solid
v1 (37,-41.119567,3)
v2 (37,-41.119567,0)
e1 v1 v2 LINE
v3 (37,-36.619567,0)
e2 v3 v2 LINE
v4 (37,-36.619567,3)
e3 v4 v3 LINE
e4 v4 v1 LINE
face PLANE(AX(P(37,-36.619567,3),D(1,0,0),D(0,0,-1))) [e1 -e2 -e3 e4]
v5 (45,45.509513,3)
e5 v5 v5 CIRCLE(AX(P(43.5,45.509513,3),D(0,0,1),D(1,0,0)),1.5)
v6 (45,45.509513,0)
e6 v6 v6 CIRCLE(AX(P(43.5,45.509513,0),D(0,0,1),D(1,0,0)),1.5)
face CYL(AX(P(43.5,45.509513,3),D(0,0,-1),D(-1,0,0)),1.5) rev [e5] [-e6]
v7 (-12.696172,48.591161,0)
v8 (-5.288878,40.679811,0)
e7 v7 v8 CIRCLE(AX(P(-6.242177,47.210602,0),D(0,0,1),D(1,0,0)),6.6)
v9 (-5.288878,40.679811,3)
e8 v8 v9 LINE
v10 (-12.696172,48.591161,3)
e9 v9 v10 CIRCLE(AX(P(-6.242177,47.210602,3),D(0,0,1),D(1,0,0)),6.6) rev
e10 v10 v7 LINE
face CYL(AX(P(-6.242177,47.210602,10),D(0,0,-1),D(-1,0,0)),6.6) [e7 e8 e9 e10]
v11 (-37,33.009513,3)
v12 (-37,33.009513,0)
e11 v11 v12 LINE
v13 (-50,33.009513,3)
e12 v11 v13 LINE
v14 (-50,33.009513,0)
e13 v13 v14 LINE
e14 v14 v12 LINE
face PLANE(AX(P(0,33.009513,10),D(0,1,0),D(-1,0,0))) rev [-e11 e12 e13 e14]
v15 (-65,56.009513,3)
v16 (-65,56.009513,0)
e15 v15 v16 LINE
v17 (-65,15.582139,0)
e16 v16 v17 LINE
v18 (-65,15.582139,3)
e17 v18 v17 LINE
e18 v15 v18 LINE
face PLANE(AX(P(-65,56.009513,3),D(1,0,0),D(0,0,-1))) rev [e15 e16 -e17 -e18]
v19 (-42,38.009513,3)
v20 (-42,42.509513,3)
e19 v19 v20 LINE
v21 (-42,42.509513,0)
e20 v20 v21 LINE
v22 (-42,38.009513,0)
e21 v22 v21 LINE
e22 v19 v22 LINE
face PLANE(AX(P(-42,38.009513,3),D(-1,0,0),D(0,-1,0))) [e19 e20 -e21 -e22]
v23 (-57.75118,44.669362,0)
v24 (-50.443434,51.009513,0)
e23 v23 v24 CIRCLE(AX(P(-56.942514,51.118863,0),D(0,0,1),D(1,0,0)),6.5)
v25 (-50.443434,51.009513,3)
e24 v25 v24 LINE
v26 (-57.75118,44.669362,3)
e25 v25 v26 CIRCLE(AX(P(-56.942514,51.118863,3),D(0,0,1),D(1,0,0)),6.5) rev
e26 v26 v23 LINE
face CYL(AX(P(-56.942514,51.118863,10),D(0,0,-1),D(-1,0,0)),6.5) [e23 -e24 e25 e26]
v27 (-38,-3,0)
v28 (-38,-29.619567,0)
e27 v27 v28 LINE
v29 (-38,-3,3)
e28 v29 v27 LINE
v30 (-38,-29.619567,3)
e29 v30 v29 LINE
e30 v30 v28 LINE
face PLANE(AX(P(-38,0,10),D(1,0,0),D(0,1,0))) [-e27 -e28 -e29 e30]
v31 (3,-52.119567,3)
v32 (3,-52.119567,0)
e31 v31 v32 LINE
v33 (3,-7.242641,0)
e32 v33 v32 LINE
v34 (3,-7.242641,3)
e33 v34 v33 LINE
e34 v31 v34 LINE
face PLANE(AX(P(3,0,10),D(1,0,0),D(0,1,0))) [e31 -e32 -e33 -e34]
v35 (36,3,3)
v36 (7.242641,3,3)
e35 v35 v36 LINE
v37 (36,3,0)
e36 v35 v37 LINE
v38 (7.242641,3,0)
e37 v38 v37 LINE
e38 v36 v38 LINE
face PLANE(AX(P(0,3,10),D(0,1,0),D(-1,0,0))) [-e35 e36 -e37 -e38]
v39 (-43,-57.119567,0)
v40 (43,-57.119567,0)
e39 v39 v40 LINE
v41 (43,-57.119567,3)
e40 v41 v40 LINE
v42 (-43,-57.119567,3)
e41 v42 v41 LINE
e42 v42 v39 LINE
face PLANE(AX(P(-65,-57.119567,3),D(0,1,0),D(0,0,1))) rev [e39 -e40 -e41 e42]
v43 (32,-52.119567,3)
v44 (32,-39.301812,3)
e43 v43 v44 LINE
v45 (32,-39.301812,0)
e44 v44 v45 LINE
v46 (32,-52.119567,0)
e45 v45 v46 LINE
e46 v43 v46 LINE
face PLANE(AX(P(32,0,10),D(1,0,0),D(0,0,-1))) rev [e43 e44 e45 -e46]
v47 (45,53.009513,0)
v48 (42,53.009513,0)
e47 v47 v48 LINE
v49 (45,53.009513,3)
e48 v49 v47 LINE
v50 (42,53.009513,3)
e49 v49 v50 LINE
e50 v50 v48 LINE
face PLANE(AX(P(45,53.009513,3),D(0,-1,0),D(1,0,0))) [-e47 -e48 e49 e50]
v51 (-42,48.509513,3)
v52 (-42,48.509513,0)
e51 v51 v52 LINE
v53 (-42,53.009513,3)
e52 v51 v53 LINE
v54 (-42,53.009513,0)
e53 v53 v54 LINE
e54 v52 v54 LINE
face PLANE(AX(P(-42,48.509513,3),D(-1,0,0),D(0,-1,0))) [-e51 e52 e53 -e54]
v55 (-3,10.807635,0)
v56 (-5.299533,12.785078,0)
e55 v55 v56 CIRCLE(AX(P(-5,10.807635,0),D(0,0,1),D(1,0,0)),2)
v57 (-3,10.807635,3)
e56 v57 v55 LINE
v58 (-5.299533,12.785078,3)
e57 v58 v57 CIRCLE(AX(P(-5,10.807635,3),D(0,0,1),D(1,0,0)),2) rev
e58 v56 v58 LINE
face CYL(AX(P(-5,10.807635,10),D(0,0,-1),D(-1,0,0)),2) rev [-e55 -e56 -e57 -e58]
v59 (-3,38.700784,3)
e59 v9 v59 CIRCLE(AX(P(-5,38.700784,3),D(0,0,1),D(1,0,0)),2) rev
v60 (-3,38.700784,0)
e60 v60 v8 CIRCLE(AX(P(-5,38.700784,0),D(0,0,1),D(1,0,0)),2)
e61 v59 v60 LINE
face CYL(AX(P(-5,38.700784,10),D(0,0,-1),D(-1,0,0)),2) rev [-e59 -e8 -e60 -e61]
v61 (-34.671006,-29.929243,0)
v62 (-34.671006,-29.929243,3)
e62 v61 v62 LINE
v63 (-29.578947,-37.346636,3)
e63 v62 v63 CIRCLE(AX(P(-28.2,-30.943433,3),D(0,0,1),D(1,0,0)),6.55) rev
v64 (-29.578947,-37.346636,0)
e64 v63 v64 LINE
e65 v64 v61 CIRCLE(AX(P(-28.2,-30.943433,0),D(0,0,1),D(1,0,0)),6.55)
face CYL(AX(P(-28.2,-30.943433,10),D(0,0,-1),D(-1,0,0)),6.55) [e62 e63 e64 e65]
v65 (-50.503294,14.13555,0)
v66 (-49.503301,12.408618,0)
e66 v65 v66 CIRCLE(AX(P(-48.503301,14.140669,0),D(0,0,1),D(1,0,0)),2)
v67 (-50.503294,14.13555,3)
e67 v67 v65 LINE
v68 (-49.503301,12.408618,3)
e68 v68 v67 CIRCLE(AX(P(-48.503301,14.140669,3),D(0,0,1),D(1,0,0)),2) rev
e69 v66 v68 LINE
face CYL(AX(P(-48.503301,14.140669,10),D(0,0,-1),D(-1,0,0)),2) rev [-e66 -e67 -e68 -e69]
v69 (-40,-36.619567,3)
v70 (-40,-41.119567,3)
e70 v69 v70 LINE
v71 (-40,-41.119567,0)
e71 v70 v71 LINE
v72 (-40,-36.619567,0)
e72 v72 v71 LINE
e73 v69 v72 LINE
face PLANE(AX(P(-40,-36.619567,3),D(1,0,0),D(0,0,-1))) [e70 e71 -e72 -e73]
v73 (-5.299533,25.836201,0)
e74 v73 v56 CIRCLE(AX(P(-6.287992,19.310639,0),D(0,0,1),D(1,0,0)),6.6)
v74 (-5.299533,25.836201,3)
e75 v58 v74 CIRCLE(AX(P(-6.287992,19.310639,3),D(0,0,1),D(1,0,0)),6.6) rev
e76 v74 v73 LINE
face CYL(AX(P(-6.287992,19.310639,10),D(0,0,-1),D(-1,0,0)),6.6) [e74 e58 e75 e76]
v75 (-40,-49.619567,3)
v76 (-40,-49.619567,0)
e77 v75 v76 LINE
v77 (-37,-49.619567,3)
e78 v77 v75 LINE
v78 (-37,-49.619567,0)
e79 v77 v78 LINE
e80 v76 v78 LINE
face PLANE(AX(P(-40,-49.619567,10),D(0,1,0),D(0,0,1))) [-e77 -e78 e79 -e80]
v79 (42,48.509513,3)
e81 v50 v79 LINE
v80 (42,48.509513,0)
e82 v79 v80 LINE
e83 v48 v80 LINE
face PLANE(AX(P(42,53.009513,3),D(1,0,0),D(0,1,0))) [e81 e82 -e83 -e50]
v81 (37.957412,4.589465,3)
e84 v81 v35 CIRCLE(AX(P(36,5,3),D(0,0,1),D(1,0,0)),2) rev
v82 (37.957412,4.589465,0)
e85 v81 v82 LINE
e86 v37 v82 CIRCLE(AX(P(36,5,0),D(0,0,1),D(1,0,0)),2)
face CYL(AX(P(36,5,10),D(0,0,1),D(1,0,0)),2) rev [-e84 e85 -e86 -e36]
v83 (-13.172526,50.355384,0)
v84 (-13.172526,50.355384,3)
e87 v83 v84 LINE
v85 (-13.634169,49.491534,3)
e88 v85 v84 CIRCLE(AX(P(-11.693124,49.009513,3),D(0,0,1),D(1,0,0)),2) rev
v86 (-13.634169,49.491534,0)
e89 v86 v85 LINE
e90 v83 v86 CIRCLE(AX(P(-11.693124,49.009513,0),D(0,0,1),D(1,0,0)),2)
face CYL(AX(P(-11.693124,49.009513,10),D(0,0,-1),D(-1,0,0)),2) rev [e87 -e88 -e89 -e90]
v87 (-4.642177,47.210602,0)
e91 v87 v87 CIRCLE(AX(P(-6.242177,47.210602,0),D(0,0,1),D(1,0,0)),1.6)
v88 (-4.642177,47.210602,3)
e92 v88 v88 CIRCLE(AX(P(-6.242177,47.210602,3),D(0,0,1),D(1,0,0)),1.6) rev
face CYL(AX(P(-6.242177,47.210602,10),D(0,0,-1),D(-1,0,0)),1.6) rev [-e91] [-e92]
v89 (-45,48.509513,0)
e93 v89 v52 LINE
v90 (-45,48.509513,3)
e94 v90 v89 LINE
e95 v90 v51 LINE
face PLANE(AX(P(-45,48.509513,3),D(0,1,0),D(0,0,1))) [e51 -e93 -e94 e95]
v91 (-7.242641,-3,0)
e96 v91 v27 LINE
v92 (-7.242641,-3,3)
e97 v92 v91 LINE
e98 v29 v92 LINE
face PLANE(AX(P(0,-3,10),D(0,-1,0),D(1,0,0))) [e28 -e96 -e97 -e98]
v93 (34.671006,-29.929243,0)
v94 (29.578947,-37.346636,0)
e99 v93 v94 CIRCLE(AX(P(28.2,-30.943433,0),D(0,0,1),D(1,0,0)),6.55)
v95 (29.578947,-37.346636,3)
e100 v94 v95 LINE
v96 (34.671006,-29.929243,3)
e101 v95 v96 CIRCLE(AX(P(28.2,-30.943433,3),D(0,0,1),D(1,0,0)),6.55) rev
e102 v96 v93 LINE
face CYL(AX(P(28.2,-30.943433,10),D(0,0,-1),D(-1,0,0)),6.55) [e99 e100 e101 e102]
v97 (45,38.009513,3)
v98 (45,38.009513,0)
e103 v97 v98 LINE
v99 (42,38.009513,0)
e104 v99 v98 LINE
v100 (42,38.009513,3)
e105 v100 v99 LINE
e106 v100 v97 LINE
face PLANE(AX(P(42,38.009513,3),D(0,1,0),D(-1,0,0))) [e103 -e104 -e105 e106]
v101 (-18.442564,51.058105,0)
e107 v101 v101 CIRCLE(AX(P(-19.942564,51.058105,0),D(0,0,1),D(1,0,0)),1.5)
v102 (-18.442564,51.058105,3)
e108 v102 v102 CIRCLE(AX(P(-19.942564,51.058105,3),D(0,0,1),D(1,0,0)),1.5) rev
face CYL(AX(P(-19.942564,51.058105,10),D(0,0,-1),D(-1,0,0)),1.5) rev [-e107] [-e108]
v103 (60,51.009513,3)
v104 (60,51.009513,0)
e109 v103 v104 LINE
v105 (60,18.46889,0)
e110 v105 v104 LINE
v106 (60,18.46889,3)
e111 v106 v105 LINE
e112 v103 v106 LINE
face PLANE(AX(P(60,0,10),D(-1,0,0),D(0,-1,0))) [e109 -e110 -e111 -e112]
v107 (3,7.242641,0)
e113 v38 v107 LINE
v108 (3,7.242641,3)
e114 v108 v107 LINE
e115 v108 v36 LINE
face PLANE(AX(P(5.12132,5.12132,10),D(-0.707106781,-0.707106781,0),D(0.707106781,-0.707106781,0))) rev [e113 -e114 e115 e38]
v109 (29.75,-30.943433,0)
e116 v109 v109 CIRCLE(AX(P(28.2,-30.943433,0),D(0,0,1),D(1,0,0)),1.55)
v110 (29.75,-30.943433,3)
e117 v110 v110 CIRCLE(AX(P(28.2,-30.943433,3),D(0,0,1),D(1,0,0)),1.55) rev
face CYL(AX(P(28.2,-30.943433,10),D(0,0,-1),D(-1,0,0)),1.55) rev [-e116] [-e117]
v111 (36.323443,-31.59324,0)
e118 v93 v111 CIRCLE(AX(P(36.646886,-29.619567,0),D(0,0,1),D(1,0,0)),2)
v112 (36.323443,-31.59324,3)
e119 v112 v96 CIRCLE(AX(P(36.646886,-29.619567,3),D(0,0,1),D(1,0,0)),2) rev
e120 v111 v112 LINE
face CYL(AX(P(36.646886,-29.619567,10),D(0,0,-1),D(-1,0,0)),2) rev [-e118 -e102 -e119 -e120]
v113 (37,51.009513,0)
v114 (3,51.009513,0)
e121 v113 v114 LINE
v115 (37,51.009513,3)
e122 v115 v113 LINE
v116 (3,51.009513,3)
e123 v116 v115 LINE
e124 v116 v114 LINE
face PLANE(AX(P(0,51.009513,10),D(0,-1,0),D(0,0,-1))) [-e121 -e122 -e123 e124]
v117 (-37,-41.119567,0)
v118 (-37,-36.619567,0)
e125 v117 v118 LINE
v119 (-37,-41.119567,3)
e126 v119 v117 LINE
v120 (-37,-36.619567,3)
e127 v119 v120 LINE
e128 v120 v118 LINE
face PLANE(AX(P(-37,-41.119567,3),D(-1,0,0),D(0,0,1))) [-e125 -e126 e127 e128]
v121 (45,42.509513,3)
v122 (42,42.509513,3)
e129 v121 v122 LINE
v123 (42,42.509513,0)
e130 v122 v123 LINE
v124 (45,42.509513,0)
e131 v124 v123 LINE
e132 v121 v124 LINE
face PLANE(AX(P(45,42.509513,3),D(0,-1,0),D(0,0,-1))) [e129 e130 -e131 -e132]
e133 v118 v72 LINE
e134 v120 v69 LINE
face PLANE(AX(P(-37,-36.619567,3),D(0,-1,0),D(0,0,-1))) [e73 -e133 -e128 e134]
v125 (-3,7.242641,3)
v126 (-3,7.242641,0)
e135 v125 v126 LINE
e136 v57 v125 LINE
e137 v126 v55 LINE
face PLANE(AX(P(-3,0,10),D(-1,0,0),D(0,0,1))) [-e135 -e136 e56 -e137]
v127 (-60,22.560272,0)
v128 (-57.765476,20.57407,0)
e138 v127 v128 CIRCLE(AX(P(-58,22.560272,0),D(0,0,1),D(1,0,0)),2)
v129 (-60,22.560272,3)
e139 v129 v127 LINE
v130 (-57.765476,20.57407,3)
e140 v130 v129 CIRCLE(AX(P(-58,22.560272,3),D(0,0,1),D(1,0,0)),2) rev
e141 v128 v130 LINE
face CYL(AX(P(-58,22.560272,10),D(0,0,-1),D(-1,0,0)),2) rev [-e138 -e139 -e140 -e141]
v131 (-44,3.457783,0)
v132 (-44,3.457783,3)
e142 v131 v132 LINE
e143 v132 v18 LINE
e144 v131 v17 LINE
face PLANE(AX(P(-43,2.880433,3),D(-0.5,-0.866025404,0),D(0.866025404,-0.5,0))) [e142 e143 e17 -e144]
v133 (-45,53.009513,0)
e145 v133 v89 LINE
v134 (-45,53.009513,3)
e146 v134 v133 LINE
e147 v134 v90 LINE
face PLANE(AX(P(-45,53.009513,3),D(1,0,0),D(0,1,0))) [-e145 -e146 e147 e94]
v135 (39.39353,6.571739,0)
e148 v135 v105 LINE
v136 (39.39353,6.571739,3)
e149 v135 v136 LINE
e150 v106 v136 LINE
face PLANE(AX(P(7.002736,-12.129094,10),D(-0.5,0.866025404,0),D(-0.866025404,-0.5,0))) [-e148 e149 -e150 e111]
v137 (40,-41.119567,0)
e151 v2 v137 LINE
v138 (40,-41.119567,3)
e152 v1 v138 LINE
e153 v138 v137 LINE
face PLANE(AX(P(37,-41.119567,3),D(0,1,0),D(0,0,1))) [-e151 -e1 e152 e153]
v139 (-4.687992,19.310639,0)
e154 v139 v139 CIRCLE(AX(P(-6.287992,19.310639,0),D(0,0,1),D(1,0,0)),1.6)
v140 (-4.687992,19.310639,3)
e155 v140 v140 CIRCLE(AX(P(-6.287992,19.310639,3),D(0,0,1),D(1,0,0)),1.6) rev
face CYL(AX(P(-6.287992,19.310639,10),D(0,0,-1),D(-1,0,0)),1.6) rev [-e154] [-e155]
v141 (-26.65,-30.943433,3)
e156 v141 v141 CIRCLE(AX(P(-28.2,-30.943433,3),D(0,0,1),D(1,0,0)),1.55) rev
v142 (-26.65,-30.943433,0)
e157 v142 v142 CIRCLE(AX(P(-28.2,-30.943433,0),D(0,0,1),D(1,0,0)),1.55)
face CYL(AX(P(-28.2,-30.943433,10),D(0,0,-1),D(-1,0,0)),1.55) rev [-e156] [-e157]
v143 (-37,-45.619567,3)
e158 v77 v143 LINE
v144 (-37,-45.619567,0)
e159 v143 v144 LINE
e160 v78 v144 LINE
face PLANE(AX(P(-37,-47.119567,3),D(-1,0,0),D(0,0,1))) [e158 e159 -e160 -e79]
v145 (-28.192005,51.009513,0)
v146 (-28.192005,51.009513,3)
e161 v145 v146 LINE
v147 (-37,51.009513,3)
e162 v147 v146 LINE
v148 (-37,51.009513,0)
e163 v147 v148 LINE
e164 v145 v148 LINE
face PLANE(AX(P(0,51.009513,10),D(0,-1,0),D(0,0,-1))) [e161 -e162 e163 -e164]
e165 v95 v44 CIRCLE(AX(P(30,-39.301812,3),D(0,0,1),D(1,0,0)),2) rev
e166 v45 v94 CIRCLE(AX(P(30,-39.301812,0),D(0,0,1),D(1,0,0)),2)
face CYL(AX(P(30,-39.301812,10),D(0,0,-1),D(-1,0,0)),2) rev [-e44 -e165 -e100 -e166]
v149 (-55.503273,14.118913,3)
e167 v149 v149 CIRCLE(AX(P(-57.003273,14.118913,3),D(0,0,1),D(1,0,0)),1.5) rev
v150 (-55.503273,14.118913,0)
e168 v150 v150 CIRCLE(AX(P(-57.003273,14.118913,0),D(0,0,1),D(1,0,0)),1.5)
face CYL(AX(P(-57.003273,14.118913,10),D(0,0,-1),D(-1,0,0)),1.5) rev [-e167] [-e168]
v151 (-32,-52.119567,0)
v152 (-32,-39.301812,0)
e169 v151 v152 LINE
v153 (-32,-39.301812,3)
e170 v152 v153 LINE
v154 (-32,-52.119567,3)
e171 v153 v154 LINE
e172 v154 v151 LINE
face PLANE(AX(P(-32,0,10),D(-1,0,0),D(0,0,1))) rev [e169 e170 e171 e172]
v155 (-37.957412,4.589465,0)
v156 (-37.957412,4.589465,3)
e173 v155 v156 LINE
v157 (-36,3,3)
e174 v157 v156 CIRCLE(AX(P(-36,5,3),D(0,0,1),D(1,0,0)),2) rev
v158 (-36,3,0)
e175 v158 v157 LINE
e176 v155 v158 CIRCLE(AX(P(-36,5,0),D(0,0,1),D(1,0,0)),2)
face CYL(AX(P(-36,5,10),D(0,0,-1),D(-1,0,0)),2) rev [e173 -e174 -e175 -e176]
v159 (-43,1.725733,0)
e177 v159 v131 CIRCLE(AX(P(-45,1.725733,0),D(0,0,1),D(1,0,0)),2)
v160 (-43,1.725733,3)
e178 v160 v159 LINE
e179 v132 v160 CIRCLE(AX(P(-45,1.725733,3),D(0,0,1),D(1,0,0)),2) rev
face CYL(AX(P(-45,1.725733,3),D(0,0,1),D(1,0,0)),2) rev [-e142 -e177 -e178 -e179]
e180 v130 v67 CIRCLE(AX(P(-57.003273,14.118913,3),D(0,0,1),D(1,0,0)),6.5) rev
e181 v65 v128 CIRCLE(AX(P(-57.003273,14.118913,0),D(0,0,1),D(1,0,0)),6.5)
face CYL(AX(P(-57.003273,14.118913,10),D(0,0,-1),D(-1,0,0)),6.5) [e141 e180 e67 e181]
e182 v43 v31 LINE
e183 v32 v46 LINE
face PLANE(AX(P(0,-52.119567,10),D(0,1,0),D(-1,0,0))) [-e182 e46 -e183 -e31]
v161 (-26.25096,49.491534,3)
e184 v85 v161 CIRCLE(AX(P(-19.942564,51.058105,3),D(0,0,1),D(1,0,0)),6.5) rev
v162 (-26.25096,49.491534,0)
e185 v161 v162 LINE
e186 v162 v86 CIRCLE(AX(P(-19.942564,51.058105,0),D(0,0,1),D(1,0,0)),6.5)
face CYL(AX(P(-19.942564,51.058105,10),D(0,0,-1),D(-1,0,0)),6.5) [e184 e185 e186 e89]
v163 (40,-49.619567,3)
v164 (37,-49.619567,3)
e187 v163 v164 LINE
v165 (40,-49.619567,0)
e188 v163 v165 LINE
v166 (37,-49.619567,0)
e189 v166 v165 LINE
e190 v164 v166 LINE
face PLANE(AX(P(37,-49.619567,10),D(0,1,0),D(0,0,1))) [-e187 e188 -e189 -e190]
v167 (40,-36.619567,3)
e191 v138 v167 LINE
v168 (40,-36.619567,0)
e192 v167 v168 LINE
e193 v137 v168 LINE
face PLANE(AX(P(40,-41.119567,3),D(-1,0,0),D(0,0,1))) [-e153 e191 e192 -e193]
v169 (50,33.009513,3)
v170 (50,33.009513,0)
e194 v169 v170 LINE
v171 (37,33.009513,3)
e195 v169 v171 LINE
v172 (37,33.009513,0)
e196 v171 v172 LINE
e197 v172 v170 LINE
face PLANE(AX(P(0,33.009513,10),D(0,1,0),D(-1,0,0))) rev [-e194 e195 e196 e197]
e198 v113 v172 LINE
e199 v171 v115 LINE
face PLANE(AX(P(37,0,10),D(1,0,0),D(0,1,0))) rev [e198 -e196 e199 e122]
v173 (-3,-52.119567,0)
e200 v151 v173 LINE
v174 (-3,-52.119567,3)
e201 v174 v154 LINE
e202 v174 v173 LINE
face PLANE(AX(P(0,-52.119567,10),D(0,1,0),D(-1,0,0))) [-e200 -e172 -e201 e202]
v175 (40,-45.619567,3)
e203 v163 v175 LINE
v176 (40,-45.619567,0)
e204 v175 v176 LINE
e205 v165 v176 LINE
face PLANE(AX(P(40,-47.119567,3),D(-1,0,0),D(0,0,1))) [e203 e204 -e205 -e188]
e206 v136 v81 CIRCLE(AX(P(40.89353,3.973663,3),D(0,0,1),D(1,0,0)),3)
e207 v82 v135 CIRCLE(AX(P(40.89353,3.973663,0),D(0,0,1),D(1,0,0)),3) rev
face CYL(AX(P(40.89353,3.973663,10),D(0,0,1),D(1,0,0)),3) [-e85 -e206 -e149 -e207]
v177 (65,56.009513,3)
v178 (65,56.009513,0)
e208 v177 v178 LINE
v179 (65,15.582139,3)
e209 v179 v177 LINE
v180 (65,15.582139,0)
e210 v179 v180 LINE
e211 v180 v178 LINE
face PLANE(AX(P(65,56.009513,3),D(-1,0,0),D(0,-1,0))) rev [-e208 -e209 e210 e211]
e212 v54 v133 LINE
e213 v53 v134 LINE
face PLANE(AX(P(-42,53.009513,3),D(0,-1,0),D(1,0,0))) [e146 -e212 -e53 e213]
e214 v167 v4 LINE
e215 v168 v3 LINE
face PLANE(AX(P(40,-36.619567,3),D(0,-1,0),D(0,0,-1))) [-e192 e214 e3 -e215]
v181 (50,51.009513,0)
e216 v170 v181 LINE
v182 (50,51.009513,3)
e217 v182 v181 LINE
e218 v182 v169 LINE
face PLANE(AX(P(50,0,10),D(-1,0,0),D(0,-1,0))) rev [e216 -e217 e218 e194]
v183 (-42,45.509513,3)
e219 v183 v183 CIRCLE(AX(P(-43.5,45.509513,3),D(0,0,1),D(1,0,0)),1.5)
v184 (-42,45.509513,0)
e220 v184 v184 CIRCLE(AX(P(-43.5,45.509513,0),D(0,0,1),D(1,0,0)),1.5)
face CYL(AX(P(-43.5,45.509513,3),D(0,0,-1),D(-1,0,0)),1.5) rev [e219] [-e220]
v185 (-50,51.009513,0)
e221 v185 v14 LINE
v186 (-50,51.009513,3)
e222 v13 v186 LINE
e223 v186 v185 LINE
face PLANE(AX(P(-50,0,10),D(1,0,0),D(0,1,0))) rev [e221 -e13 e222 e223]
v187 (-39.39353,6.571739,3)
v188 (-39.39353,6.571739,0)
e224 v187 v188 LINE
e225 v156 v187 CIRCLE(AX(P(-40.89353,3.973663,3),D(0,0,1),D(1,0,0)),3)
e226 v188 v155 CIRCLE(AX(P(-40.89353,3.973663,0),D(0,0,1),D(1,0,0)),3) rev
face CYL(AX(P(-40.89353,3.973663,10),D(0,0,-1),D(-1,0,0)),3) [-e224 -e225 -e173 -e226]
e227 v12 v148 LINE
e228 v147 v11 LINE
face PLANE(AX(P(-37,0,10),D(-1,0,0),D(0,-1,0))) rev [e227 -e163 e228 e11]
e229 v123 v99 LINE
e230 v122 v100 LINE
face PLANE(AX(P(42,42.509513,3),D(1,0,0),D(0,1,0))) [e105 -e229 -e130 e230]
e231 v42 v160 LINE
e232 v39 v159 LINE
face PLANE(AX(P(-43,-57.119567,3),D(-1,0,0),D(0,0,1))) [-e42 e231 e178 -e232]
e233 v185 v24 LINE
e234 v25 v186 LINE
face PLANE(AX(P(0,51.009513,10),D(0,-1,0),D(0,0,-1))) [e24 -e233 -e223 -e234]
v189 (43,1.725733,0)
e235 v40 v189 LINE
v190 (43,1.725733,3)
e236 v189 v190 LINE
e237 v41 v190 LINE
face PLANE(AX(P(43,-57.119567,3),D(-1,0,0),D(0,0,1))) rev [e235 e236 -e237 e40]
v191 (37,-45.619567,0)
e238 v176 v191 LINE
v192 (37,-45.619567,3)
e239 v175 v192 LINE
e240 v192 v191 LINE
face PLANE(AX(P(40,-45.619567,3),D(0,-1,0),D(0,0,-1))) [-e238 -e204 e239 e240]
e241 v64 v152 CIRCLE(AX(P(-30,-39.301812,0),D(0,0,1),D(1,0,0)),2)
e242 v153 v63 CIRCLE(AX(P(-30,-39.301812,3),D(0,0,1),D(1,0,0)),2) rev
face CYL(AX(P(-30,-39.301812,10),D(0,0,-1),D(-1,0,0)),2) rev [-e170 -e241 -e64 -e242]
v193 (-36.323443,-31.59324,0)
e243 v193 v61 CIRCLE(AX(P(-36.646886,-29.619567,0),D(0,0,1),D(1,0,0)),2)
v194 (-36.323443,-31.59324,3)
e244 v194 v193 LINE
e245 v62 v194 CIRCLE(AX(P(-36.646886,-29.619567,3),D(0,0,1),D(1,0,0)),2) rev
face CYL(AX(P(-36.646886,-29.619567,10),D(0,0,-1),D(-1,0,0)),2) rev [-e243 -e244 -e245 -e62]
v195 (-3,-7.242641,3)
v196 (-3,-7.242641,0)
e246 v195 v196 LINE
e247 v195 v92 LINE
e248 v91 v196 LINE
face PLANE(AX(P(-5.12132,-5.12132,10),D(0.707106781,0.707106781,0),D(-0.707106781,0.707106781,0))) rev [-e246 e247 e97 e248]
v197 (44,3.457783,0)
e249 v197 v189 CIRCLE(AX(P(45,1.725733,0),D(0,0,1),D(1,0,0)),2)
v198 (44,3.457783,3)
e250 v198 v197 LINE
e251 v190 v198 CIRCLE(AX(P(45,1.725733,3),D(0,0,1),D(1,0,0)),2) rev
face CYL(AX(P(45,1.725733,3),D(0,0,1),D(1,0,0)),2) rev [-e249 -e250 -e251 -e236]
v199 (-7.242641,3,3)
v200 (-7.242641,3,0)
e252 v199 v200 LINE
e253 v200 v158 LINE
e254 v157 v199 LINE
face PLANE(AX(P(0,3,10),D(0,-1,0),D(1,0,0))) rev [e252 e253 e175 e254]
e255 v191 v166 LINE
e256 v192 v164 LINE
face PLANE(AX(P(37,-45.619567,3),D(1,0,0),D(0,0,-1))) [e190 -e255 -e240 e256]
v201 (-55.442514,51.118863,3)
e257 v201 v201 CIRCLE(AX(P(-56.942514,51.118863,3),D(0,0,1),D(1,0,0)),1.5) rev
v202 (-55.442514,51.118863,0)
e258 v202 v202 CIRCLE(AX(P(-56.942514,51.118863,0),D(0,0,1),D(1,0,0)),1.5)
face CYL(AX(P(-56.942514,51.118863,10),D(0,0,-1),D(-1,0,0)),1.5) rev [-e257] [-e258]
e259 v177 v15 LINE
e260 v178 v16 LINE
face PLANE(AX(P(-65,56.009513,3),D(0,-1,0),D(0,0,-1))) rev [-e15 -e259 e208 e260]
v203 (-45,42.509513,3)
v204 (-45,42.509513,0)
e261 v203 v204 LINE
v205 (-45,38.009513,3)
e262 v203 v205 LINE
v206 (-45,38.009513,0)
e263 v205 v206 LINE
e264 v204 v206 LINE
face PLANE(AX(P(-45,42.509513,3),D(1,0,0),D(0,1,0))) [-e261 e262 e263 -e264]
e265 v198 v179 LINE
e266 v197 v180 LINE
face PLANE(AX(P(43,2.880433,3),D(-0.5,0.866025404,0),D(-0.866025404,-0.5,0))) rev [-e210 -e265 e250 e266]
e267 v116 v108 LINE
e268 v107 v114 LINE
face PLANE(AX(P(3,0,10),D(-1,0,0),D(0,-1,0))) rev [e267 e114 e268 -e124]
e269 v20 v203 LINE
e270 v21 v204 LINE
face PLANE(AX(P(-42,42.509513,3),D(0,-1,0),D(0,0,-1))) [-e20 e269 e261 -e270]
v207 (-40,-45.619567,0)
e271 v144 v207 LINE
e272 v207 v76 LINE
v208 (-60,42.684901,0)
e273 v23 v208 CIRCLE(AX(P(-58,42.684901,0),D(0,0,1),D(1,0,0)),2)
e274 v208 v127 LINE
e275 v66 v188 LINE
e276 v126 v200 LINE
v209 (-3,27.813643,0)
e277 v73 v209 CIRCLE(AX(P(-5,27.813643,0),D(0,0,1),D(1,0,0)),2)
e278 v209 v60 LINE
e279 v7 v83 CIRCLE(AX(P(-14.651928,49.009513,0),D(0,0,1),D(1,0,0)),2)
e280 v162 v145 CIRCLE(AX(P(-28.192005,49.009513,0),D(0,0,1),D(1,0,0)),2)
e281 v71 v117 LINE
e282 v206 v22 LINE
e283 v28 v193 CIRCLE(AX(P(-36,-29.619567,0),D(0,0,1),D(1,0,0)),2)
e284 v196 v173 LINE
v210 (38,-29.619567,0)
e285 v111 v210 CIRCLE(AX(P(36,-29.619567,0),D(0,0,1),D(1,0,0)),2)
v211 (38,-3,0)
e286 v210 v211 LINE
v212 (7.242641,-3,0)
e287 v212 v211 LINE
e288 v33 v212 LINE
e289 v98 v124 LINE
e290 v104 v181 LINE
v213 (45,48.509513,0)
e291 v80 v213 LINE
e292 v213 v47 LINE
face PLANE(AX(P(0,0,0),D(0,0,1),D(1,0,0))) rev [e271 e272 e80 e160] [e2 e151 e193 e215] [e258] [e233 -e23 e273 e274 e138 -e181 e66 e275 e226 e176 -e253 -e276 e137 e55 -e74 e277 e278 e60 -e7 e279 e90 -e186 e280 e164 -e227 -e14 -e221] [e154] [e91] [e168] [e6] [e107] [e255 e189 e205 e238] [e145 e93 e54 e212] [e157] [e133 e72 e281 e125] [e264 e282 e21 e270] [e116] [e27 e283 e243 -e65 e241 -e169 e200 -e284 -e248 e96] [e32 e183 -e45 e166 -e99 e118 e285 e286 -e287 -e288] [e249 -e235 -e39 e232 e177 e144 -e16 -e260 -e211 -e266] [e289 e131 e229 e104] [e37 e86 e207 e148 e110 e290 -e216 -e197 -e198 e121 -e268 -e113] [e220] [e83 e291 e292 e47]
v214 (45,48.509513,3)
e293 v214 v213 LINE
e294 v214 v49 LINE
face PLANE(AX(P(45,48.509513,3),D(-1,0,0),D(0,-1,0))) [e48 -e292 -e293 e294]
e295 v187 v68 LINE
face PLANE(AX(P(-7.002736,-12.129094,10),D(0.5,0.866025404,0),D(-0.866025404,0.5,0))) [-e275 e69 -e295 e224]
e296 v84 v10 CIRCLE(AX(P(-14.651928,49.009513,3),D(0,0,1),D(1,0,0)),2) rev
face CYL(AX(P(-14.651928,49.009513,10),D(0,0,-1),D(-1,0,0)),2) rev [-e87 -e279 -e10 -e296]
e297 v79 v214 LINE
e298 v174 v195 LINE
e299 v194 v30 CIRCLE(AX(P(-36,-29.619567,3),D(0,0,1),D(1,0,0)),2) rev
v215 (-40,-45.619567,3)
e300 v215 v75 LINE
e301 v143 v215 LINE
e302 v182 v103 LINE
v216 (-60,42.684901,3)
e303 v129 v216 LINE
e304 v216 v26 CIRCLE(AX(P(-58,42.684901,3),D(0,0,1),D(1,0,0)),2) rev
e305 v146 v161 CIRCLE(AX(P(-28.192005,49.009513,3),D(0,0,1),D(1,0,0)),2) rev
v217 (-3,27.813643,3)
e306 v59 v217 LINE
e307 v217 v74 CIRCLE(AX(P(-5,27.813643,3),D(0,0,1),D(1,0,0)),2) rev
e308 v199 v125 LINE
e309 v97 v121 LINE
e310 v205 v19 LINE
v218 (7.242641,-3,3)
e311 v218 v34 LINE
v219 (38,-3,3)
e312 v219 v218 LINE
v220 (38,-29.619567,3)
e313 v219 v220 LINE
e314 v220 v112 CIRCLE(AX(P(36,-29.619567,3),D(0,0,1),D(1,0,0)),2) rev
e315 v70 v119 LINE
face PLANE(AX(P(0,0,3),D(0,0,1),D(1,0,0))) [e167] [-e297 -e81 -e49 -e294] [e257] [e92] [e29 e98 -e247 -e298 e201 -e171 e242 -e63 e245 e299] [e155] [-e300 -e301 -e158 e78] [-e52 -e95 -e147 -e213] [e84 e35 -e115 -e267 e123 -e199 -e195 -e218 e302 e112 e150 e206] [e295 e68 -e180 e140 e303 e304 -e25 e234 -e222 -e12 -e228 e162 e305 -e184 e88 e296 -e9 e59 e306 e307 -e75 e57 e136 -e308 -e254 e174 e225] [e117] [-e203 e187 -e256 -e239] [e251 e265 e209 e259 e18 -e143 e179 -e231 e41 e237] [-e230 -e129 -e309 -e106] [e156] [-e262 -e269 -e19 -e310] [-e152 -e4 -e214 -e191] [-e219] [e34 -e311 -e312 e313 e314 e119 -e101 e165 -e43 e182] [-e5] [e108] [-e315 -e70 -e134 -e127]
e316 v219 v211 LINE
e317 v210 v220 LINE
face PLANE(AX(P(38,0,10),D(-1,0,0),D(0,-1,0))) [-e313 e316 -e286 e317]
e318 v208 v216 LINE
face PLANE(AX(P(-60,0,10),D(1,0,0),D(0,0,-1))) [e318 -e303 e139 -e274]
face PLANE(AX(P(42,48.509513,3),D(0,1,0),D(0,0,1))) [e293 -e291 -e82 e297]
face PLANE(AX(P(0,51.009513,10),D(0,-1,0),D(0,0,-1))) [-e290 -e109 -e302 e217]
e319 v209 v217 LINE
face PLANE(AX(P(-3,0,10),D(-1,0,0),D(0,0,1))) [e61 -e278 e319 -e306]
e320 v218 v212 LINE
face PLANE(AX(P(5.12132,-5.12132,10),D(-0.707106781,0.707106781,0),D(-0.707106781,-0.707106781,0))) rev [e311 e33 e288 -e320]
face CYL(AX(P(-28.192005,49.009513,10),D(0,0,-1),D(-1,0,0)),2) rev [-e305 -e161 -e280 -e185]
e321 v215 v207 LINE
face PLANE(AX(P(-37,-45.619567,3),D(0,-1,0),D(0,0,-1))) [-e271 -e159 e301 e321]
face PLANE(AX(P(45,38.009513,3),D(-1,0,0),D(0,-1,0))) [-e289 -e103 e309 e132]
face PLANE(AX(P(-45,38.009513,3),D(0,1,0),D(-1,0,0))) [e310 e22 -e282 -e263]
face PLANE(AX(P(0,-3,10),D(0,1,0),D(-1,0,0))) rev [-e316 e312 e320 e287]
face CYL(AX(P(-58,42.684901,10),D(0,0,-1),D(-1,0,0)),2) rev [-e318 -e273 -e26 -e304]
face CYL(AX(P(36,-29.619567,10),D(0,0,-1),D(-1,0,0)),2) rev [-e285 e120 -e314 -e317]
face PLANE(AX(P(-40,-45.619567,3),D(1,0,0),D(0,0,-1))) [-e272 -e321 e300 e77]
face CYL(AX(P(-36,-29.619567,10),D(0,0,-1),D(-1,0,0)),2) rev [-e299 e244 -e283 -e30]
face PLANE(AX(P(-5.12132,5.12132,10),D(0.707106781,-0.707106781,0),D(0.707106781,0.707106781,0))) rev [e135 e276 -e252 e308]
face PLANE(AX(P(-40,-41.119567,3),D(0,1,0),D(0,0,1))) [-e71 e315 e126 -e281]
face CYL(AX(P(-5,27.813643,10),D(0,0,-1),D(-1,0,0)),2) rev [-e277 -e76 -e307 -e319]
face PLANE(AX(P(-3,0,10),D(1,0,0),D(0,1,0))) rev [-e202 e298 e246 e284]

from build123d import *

# Parameters (mm, degrees)
CROQUIS1_W                 = 130
CROQUIS1_H                 = 113.129079584
CROQUIS1_W_2               = 3
CROQUIS1_H_2               = 1.5
CROQUIS1_H_3               = 4.5
SALIENTE_EXTRUIR1_DEPTH    = 3
CORTAR_EXTRUIR1_DEPTH      = 3
CROQUIS7_R                 = 1.55
CROQUIS7_R_2               = 1.6
CROQUIS7_R_3               = 1.5
CORTAR_EXTRUIR3_DEPTH      = 10
CORTAR_EXTRUIR4_DEPTH      = 10
CROQUIS9_W                 = 3
CROQUIS9_H                 = 4
CORTAR_EXTRUIR5_DEPTH      = 10
CORTAR_EXTRUIR6_DEPTH      = 87.58316764
CORTAR_EXTRUIR6_DEPTH_BACK = 87.58316764
CROQUIS10_R                = 1.5
REDONDEO1_R                = 2
REDONDEO2_R                = 3


with BuildPart() as part:
    # Croquis1 → Saliente-Extruir1 (new body)
    with BuildSketch(Plane.XY):
        with Locations((0, -0.555027071)):
            Rectangle(CROQUIS1_W, CROQUIS1_H)
        with Locations((38.5, -46.369566863)):
            Rectangle(CROQUIS1_W_2, CROQUIS1_H_2, mode=Mode.SUBTRACT)
        with Locations((-38.5, -46.369566863)):
            Rectangle(CROQUIS1_W_2, CROQUIS1_H_2, mode=Mode.SUBTRACT)
        with Locations((38.5, -38.869566863)):
            Rectangle(CROQUIS1_W_2, CROQUIS1_H_3, mode=Mode.SUBTRACT)
        with Locations((-38.5, -38.869566863)):
            Rectangle(CROQUIS1_W_2, CROQUIS1_H_3, mode=Mode.SUBTRACT)
        with Locations((43.5, 40.259512721)):
            Rectangle(CROQUIS1_W_2, CROQUIS1_H_3, mode=Mode.SUBTRACT)
        with Locations((43.5, 50.759512721)):
            Rectangle(CROQUIS1_W_2, CROQUIS1_H_3, mode=Mode.SUBTRACT)
        with Locations((-43.5, 40.259512721)):
            Rectangle(CROQUIS1_W_2, CROQUIS1_H_3, mode=Mode.SUBTRACT)
        with Locations((-43.5, 50.759512721)):
            Rectangle(CROQUIS1_W_2, CROQUIS1_H_3, mode=Mode.SUBTRACT)
    extrude(amount=SALIENTE_EXTRUIR1_DEPTH)

    # Croquis2 → Cortar-Extruir1 (cut)
    with BuildSketch(Plane.XY):
        Polygon((-43, -57.119566863), (-43, 2.880433137), (-65, 15.582139059), (-65, -57.119566863), align=None)
    cortar_extruir1 = extrude(amount=CORTAR_EXTRUIR1_DEPTH, mode=Mode.SUBTRACT)

    # Simetría1: Cortar-Extruir1 across plane
    add(cortar_extruir1.mirror(Plane(origin=(0, 0, 0), x_dir=(0, 0, 1), z_dir=(1, 0, 0))), mode=Mode.SUBTRACT)

    # Croquis7 → Cortar-Extruir3 (cut)
    with BuildSketch(Plane.XY):
        with Locations((-28.2, -30.943433351)):
            Circle(CROQUIS7_R)
        with Locations((28.2, -30.943433351)):
            Circle(CROQUIS7_R)
        with Locations((-6.242176561, 47.210601794)):
            Circle(CROQUIS7_R_2)
        with Locations((-6.287991701, 19.310639411)):
            Circle(CROQUIS7_R_2)
        with Locations((-57.003272906, 14.118912973)):
            Circle(CROQUIS7_R_3)
        with Locations((-19.942564364, 51.058104658)):
            Circle(CROQUIS7_R_3)
        with Locations((-56.942514477, 51.118863087)):
            Circle(CROQUIS7_R_3)
    extrude(amount=CORTAR_EXTRUIR3_DEPTH, mode=Mode.SUBTRACT)

    # Croquis8 → Cortar-Extruir4 (cut)
    with BuildSketch(Plane.XY):
        Polygon((37, 33.009512721), (37, 51.009512721), (3, 51.009512721), (3, 7.242640687), (7.242640687, 3), (38, 3), (38, 5.767184483), (60, 18.468890405), (60, 51.009512721), (50, 51.009512721), (50, 33.009512721), align=None)
        with BuildLine():
            Line((-7.242640687, 3), (-3, 7.242640687))
            Line((-3, 7.242640687), (-3, 13.58795555))
            ThreePointArc((-3, 13.58795555), (-12.887991701, 19.310639411), (-3, 25.033323272))
            Line((-3, 25.033323272), (-3, 41.461837479))
            ThreePointArc((-3, 41.461837479), (-11.136091988, 42.782329919), (-11.639238333, 51.009512721))
            Line((-11.639238333, 51.009512721), (-13.442745995, 51.009512721))
            ThreePointArc((-13.442745995, 51.009512721), (-19.942564364, 44.558104658), (-26.442382732, 51.009512721))
            Line((-26.442382732, 51.009512721), (-37, 51.009512721))
            Line((-37, 51.009512721), (-37, 33.009512721))
            Line((-37, 33.009512721), (-50, 33.009512721))
            Line((-50, 33.009512721), (-50, 51.009512721))
            Line((-50, 51.009512721), (-50.44343435, 51.009512721))
            ThreePointArc((-50.44343435, 51.009512721), (-53.644642278, 45.517609749), (-60, 45.382855566))
            Line((-60, 45.382855566), (-60, 19.886895872))
            ThreePointArc((-60, 19.886895872), (-53.177308637, 19.373624897), (-50.59374625, 13.03818727))
            Line((-50.59374625, 13.03818727), (-38, 5.767184483))
            Line((-38, 5.767184483), (-38, 3))
            Line((-38, 3), (-7.242640687, 3))
        make_face()
        with BuildLine():
            Line((38, -3), (7.242640687, -3))
            Line((7.242640687, -3), (3, -7.242640687))
            Line((3, -7.242640687), (3, -52.119566863))
            Line((3, -52.119566863), (32, -52.119566863))
            Line((32, -52.119566863), (32, -36.278459124))
            ThreePointArc((32, -36.278459124), (22.540832887, -27.64550558), (34.715009092, -31.619566863))
            Line((34.715009092, -31.619566863), (38, -31.619566863))
            Line((38, -31.619566863), (38, -3))
        make_face()
        with BuildLine():
            Line((-3, -7.242640687), (-7.242640687, -3))
            Line((-7.242640687, -3), (-38, -3))
            Line((-38, -3), (-38, -31.619566863))
            Line((-38, -31.619566863), (-34.715009092, -31.619566863))
            ThreePointArc((-34.715009092, -31.619566863), (-22.540832887, -27.64550558), (-32, -36.278459124))
            Line((-32, -36.278459124), (-32, -52.119566863))
            Line((-32, -52.119566863), (-3, -52.119566863))
            Line((-3, -52.119566863), (-3, -7.242640687))
        make_face()
    extrude(amount=CORTAR_EXTRUIR4_DEPTH, mode=Mode.SUBTRACT)

    # Croquis9 → Cortar-Extruir5 (cut)
    with BuildSketch(Plane.XY):
        with Locations((-38.5, -47.619566863)):
            Rectangle(CROQUIS9_W, CROQUIS9_H)
        with Locations((38.5, -47.619566863)):
            Rectangle(CROQUIS9_W, CROQUIS9_H)
    extrude(amount=CORTAR_EXTRUIR5_DEPTH, mode=Mode.SUBTRACT)

    # Croquis10 → Cortar-Extruir6 (cut, two sides: drawn at the far end of the back side and taken through both)
    with BuildSketch(Plane.XY.offset(-CORTAR_EXTRUIR6_DEPTH_BACK)):
        with Locations((43.5, 45.509512721)):
            Circle(CROQUIS10_R)
        with Locations((-43.5, 45.509512721)):
            Circle(CROQUIS10_R)
    extrude(amount=CORTAR_EXTRUIR6_DEPTH + CORTAR_EXTRUIR6_DEPTH_BACK, mode=Mode.SUBTRACT)

    # Redondeo1
    # the kernel refuses this fillet: 2 mm, written as the material it adds along each edge
    with BuildSketch(Plane(origin=(32, -36.278459124, 0), x_dir=(-0.9149086715466047, -0.40366090066889926, 0), z_dir=(0, 0, 1))) as redondeo1_piece_1:
        with BuildLine():
            CenterArc((3.050226842, 1.95877031), REDONDEO1_R, 156.192760529, 102.153197469)
            Line((1.220409498, 2.766092111), (0, 0))
            ThreePointArc((0, 0), (1.323111643, 0.135027235), (2.646223286, 0))
        make_face()
    extrude(amount=3)
    with BuildSketch(Plane(origin=(38, -31.619566863, 0), x_dir=(-1, 0, 0), z_dir=(0, 0, 1)), Plane(origin=(-38, -31.619566863, 0), x_dir=(0, 1, 0), z_dir=(0, 0, 1)), Plane(origin=(-38, 3, 0), x_dir=(0, 1, 0), z_dir=(0, 0, 1))) as redondeo1_piece_2:
        with BuildLine():
            CenterArc((REDONDEO1_R, -REDONDEO1_R), REDONDEO1_R, 90, 90)
            Line((0, -REDONDEO1_R), (0, 0))
            Line((0, 0), (REDONDEO1_R, 0))
        make_face()
    extrude(amount=3)
    with BuildSketch(Plane(origin=(34.715009092, -31.619566863, 0), x_dir=(-0.02602354238357217, 0.999661330272313, 0), z_dir=(0, 0, 1))) as redondeo1_piece_3:
        with BuildLine():
            CenterArc((1.949048389, -1.983269394), REDONDEO1_R, 97.416204182, 81.092588325)
            Line((-0.050274272, -1.93122231), (0, 0))
            ThreePointArc((0, 0), (0.845448142, -0.054792733), (1.690896284, 0))
        make_face()
    extrude(amount=3)
    with BuildSketch(Plane(origin=(-32, -36.278459124, 0), x_dir=(0, -1, 0), z_dir=(0, 0, 1))) as redondeo1_piece_4:
        with BuildLine():
            CenterArc((3.023353256, 2), REDONDEO1_R, 167.846802531, 102.153197469)
            ThreePointArc((1.068176875, 2.421052632), (0.657626025, 1.156021101), (0, 0))
            Line((0, 0), (3.023353256, 0))
        make_face()
    extrude(amount=3)
    with BuildSketch(Plane(origin=(-34.715009092, -31.619566863, 0), x_dir=(0.026023542383658504, 0.9996613302723107, 0), z_dir=(0, 0, 1))) as redondeo1_piece_5:
        with BuildLine():
            CenterArc((1.949048389, 1.983269394), REDONDEO1_R, 181.491207493, 81.092588325)
            Line((-0.050274272, 1.93122231), (0, 0))
            ThreePointArc((0, 0), (0.845448142, 0.054792733), (1.690896284, 0))
        make_face()
    extrude(amount=3)
    with BuildSketch(Plane(origin=(-43, 2.880433137, 0), x_dir=(-0.866025403784439, 0.49999999999999933, 0), z_dir=(0, 0, 1))) as redondeo1_piece_6:
        with BuildLine():
            CenterArc((REDONDEO1_R * 0.57735026919, REDONDEO1_R), REDONDEO1_R, 210, 60)
            Line((-REDONDEO1_R * 0.288675134595, REDONDEO1_R * 0.5), (0, 0))
            Line((0, 0), (REDONDEO1_R * 0.57735026919, 0))
        make_face()
    extrude(amount=3)
    with BuildSketch(Plane(origin=(43, 2.880433137, 0), x_dir=(0.866025403784439, 0.49999999999999933, 0), z_dir=(0, 0, 1))) as redondeo1_piece_7:
        with BuildLine():
            CenterArc((REDONDEO1_R * 0.57735026919, -REDONDEO1_R), REDONDEO1_R, 90, 60)
            Line((-REDONDEO1_R * 0.288675134595, -REDONDEO1_R * 0.5), (0, 0))
            Line((0, 0), (REDONDEO1_R * 0.57735026919, 0))
        make_face()
    extrude(amount=3)
    with BuildSketch(Plane(origin=(38, 3, 0), x_dir=(0, 1, 0), z_dir=(0, 0, 1))) as redondeo1_piece_8:
        with BuildLine():
            CenterArc((REDONDEO1_R, REDONDEO1_R), REDONDEO1_R, 180, 90)
            Line((0, REDONDEO1_R), (0, 0))
            Line((0, 0), (REDONDEO1_R, 0))
        make_face()
    extrude(amount=3)
    with BuildSketch(Plane(origin=(-3, 13.58795555, 0), x_dir=(0, -1, 0), z_dir=(0, 0, 1))) as redondeo1_piece_9:
        with BuildLine():
            CenterArc((2.78032016, -2), REDONDEO1_R, 90, 98.613393798)
            ThreePointArc((0.802877364, -2.299532954), (0.508434809, -1.112408992), (0, 0))
            Line((0, 0), (2.78032016, 0))
        make_face()
    extrude(amount=3)
    with BuildSketch(Plane(origin=(-3, 41.461837479, 0), x_dir=(0, -1, 0), z_dir=(0, 0, 1))) as redondeo1_piece_10:
        with BuildLine():
            CenterArc((2.761053391, -2), REDONDEO1_R, 90, 98.304802099)
            ThreePointArc((0.782026018, -2.28887827), (0.496762606, -1.108308364), (0, 0))
            Line((0, 0), (2.761053391, 0))
        make_face()
    extrude(amount=3)
    with BuildSketch(Plane(origin=(-60, 45.382855566, 0), x_dir=(0, -1, 0), z_dir=(0, 0, 1))) as redondeo1_piece_11:
        with BuildLine():
            CenterArc((2.697955034, 2), REDONDEO1_R, 172.853311138, 97.146688862)
            ThreePointArc((0.713493256, 2.248820123), (0.459632164, 1.091767106), (0, 0))
            Line((0, 0), (2.697955034, 0))
        make_face()
    extrude(amount=3)
    with BuildSketch(Plane(origin=(-26.442382732, 51.009512721, 0), x_dir=(-1, 0, 0), z_dir=(0, 0, 1))) as redondeo1_piece_12:
        with BuildLine():
            CenterArc((1.749622284, 2), REDONDEO1_R, 193.946207215, 76.053792785)
            ThreePointArc((-0.191422576, 1.517978368), (-0.05089194, 0.764641066), (0, 0))
            Line((0, 0), (1.749622284, 0))
        make_face()
    extrude(amount=3)
    with BuildSketch(Plane(origin=(-13.442745995, 51.009512721, 0), x_dir=(-0.12511276967774176, -0.9921425274946963, 0), z_dir=(0, 0, 1))) as redondeo1_piece_13:
        with BuildLine():
            CenterArc((1.765384965, 1.986100214), REDONDEO1_R, 187.187268132, 76.053792785)
            Line((-0.21890009, 1.735874675), (0, 0))
            ThreePointArc((0, 0), (0.765000152, 0.045174304), (1.530000303, 0))
        make_face()
    extrude(amount=3)
    with BuildSketch(Plane(origin=(-11.639238333, 51.009512721, 0), x_dir=(-0.40047050280585245, -0.916309650927255, 0), z_dir=(0, 0, 1))) as redondeo1_piece_14:
        with BuildLine():
            CenterArc((3.039112653, -1.959615623), REDONDEO1_R, 101.533545262, 102.074049912)
            Line((1.206493351, -2.760556629), (0, 0))
            ThreePointArc((0, 0), (1.319614704, -0.133268443), (2.639229409, 0))
        make_face()
    extrude(amount=3)
    with BuildSketch(Plane(origin=(-3, 25.033323272, 0), x_dir=(-0.9441088893447234, 0.329633743813149, 0), z_dir=(0, 0, 1))) as redondeo1_piece_15:
        with BuildLine():
            CenterArc((2.804705122, -1.96565749), REDONDEO1_R, 100.633152949, 98.613393798)
            Line((0.916487343, -2.624924978), (0, 0))
            ThreePointArc((0, 0), (1.217832487, -0.113330282), (2.435664974, 0))
        make_face()
    extrude(amount=3)
    with BuildSketch(Plane(origin=(-60, 19.886895872, 0), x_dir=(0.9558237450549008, 0.29394041639288776, 0), z_dir=(0, 0, 1))) as redondeo1_piece_16:
        with BuildLine():
            CenterArc((2.697460658, 1.967395146), REDONDEO1_R, 162.905989019, 96.734111648)
            Line((0.785813168, 2.555275979), (0, 0))
            ThreePointArc((0, 0), (1.168899619, 0.105965774), (2.337799237, 0))
        make_face()
    extrude(amount=3)
    with BuildSketch(Plane(origin=(-50.59374625, 13.03818727, 0), x_dir=(0.08214816682201194, 0.996620127575087, 0), z_dir=(0, 0, 1))) as redondeo1_piece_17:
        with BuildLine():
            CenterArc((1.270481822, -1.992813203), REDONDEO1_R, 94.858704239, 59.853348925)
            Line((-0.537863042, -1.138477874), (0, 0))
            ThreePointArc((0, 0), (0.550542123, -0.023357091), (1.101084246, 0))
        make_face()
    extrude(amount=3)

    # Redondeo2
    redondeo2_edges = [part.edges().sort_by_distance(p)[0] for p in [
        (-38, 5.767184483, 1.5),
        (38, 5.767184483, 1.5),
    ]]
    fillet(redondeo2_edges, radius=REDONDEO2_R)


solid = part.part
